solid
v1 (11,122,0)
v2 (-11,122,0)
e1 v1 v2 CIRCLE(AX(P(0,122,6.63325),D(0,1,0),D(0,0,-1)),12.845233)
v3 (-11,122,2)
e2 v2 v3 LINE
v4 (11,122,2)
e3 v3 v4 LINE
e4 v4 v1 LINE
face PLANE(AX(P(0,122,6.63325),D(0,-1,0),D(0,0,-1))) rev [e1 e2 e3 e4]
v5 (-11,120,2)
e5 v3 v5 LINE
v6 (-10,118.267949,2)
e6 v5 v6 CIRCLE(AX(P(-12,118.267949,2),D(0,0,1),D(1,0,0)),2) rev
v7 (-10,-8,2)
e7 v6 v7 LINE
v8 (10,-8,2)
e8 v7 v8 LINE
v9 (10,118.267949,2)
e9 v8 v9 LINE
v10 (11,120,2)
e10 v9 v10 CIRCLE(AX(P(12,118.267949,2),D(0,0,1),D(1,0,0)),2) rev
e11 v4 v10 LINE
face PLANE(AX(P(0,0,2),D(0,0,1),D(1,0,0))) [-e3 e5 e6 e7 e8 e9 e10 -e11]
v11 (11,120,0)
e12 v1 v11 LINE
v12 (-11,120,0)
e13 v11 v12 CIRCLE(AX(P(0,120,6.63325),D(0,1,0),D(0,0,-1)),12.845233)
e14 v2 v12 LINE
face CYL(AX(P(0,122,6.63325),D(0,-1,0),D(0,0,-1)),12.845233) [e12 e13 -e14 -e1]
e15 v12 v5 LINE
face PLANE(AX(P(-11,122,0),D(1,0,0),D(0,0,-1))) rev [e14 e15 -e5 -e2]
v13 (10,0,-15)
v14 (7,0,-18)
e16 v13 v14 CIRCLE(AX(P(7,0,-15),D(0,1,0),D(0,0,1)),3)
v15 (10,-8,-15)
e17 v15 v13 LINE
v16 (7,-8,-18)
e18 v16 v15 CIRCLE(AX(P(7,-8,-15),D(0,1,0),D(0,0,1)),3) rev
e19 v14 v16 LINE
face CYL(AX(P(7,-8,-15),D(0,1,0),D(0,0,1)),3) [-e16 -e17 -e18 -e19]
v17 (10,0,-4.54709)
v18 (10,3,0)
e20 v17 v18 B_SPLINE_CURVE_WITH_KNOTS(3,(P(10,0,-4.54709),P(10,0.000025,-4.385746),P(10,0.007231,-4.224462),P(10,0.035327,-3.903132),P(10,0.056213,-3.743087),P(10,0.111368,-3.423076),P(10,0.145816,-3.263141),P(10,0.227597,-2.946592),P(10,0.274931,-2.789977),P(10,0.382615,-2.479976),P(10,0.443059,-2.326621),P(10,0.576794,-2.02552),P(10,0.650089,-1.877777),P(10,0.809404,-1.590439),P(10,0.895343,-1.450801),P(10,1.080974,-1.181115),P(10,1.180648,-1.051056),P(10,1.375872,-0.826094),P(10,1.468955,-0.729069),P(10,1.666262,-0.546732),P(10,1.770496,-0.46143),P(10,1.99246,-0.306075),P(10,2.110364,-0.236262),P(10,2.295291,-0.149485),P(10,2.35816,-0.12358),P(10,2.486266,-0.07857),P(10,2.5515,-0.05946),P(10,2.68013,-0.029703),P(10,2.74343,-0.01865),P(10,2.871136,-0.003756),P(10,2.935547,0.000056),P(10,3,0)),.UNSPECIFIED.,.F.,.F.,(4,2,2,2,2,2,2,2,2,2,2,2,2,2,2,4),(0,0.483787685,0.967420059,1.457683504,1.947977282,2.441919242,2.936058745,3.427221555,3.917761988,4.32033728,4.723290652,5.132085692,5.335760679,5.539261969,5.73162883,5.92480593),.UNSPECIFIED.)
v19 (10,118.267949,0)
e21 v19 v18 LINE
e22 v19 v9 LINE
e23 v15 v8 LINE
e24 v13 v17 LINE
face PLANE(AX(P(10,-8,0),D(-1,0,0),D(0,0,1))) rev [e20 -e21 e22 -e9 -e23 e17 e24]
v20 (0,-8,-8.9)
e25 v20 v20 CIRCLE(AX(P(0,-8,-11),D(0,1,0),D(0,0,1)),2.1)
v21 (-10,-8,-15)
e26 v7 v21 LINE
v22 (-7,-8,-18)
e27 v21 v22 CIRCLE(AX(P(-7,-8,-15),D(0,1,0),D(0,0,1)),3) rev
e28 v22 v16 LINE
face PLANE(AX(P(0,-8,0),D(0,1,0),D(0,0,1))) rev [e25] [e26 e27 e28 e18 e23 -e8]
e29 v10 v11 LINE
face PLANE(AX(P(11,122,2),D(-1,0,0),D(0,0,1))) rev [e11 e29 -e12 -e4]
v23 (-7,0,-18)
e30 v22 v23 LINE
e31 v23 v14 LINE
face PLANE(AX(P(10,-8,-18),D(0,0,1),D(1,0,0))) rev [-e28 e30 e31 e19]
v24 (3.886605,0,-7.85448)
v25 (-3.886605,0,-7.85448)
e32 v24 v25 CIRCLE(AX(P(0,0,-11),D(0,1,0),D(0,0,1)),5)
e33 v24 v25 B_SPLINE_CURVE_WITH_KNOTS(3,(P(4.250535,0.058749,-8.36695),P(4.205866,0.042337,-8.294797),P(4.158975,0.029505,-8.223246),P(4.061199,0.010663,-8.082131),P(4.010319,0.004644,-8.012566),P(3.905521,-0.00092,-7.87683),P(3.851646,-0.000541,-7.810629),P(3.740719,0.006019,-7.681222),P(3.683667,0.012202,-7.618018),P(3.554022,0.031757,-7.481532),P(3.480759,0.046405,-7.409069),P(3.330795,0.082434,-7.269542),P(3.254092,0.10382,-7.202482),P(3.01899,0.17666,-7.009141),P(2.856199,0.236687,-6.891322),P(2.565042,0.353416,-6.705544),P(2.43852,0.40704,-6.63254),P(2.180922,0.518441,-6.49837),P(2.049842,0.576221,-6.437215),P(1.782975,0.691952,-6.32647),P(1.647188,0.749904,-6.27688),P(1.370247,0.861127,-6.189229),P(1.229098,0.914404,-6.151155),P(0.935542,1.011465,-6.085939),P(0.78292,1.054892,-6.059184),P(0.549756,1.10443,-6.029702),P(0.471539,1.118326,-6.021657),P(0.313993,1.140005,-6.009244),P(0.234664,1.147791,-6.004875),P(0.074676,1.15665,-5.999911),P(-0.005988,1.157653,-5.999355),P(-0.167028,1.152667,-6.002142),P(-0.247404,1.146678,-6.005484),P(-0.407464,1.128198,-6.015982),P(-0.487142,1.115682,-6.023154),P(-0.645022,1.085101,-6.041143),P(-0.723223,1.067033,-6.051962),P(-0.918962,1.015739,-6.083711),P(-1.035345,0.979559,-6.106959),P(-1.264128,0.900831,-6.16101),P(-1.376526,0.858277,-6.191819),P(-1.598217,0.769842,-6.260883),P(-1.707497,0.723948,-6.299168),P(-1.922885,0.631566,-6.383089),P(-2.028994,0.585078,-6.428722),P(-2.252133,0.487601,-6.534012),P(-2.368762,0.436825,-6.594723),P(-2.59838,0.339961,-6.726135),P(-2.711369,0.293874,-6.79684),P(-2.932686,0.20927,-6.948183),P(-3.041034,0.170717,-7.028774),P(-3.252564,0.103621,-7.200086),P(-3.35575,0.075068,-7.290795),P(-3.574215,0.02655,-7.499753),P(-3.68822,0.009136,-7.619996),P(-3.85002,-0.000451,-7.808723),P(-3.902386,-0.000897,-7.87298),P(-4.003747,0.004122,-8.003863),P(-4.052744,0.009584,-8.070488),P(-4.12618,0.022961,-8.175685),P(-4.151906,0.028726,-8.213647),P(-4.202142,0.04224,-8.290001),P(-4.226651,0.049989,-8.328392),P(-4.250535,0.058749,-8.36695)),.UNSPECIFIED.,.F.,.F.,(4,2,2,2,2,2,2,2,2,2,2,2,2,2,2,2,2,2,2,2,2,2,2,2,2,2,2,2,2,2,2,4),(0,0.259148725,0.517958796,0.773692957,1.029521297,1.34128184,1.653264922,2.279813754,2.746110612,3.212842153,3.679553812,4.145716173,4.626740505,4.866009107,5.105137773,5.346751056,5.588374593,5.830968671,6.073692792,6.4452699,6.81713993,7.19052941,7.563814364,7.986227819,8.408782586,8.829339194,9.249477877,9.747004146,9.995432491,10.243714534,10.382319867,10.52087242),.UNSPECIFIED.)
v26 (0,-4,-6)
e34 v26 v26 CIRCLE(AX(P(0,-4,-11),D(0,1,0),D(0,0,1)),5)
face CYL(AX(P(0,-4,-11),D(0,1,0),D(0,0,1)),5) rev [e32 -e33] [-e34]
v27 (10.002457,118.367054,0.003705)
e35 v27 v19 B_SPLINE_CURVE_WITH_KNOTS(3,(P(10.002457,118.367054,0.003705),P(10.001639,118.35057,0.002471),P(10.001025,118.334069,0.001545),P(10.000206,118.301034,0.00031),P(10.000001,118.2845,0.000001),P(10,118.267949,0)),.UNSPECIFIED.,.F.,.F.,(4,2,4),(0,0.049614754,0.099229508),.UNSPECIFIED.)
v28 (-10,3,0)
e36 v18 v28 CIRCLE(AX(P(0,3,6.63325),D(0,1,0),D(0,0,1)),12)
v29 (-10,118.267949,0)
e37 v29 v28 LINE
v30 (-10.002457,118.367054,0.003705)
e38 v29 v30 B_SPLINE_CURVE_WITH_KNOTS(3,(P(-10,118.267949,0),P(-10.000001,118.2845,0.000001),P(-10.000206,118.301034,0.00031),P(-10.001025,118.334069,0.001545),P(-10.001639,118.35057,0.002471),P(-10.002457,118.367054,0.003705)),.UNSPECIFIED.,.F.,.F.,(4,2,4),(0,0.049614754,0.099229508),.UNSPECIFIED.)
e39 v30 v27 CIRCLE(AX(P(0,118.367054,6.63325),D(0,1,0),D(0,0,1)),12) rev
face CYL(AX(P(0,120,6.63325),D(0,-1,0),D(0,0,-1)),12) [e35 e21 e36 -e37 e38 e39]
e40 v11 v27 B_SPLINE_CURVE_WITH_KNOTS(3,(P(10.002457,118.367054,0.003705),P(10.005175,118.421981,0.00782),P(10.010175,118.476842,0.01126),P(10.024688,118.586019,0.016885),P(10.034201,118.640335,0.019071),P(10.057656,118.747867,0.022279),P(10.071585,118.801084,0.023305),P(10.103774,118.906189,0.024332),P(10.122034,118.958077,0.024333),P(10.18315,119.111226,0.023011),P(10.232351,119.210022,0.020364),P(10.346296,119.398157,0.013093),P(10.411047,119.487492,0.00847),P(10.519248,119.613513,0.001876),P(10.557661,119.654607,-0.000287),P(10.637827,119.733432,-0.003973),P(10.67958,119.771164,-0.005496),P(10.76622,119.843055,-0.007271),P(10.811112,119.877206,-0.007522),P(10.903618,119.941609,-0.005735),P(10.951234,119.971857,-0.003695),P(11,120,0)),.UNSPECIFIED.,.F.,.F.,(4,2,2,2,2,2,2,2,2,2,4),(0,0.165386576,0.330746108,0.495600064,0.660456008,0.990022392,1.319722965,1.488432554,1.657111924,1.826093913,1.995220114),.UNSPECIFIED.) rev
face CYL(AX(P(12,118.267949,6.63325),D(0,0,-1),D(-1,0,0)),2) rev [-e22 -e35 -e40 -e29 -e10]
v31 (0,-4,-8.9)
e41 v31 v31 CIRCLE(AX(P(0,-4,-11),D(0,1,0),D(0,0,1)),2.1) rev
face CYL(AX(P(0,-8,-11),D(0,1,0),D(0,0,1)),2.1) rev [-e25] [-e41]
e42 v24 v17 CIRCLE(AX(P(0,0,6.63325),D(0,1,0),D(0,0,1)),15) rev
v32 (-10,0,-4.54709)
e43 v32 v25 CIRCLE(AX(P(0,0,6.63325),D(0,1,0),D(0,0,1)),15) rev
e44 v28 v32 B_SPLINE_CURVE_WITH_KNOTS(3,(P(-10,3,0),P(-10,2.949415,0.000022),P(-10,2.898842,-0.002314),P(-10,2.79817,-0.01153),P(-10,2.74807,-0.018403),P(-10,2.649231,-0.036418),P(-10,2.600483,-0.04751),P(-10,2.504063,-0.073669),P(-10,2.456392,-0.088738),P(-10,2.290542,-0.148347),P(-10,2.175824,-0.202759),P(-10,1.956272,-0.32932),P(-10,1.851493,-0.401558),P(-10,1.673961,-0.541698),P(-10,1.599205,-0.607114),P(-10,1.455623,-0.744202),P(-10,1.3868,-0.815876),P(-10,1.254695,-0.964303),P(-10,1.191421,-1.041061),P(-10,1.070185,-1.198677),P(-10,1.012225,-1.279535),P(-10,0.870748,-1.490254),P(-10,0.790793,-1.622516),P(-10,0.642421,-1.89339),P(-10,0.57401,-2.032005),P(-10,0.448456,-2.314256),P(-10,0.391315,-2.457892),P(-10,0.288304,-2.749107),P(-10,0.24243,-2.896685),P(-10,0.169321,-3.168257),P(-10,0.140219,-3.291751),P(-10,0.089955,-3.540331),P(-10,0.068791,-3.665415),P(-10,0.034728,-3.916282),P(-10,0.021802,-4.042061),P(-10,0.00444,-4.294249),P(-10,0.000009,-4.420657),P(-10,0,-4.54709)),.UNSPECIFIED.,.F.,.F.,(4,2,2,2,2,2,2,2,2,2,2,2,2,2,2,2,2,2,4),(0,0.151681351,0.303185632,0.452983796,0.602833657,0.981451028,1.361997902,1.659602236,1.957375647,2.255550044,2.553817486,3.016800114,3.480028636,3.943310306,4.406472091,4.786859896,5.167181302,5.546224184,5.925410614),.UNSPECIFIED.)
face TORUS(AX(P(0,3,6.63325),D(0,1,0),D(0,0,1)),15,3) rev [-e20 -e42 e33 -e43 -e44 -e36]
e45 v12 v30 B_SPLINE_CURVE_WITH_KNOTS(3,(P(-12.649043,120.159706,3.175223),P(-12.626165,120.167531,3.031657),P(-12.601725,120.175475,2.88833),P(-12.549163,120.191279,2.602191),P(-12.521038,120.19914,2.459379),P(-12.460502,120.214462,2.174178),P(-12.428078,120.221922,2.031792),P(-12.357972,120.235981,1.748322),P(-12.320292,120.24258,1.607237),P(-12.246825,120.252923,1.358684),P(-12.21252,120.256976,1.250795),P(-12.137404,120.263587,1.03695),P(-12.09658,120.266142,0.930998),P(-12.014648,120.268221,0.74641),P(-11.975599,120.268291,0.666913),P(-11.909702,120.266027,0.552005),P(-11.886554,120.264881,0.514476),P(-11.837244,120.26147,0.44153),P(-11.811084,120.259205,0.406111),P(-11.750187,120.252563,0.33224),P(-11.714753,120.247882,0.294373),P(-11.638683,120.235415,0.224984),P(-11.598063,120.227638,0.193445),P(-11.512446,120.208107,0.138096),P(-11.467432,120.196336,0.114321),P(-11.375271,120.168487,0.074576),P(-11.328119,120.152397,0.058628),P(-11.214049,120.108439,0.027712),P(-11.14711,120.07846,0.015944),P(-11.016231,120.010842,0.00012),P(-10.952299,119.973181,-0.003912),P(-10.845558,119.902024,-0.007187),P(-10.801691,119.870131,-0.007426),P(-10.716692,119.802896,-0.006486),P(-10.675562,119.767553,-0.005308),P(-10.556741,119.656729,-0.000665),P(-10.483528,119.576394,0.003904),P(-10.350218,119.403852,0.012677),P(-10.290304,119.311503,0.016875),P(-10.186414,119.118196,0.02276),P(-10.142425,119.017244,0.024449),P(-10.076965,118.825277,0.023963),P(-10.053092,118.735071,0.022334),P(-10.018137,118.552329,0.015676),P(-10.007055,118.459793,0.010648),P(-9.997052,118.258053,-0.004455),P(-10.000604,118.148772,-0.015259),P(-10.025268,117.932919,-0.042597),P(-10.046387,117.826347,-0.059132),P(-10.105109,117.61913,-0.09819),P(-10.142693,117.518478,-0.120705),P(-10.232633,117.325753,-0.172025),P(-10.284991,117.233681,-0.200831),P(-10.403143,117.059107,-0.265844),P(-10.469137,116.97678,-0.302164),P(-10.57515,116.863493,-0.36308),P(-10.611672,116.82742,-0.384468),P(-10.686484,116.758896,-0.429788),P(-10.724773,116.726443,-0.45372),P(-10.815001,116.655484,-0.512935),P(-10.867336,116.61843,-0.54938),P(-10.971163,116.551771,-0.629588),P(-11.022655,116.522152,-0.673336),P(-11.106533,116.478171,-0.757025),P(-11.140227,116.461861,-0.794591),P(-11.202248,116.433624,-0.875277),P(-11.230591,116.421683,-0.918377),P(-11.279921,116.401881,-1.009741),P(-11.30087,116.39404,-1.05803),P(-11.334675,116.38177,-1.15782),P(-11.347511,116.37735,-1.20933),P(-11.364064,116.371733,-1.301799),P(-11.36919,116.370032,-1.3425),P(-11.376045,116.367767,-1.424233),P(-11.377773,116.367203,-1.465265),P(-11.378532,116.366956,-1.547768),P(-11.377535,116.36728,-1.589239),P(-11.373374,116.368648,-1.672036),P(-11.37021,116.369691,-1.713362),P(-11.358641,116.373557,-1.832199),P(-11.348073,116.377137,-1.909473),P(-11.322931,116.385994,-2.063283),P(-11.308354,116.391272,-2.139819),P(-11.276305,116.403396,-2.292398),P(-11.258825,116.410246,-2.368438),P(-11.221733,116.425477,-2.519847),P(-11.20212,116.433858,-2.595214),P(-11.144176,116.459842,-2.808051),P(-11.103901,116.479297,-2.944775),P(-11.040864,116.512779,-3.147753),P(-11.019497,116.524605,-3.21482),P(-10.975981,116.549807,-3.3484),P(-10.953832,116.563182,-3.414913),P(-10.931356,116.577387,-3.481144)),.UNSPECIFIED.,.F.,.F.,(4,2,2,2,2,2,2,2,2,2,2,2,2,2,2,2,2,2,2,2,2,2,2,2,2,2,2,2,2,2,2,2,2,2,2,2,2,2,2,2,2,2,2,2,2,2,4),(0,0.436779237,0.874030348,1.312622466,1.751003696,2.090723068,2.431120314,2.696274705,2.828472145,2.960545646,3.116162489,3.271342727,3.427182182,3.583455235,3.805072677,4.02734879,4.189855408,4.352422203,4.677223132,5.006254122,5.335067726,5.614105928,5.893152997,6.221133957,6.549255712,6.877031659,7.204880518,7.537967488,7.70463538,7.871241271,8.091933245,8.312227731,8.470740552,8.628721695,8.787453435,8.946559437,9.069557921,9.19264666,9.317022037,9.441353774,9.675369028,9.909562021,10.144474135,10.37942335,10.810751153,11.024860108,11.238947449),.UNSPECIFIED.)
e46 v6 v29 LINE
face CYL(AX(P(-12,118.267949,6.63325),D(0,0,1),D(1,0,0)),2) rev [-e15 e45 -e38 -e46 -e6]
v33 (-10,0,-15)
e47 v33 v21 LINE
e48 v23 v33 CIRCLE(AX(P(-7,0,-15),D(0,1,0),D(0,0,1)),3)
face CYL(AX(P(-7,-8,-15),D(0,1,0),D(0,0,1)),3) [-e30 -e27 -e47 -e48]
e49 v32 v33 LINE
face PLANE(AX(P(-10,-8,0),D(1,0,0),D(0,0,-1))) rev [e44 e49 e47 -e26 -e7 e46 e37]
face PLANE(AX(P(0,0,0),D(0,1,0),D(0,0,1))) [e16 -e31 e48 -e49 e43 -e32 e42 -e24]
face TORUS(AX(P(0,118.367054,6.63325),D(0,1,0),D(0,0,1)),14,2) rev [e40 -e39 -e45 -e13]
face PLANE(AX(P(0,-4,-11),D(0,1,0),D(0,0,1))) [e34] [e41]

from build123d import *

# Parameters (mm, degrees)
BOSS_EXTRU_1_DEPTH           = 120
ESQUISSE3_W                  = 20
ESQUISSE3_H                  = 18
BOSS_EXTRU_2_DEPTH           = 8
CONG_1_R                     = 3
CONG_2_R                     = 3
ENL_V_MAT_EXTRU_1_DEPTH      = 122.75385005
ENL_V_MAT_EXTRU_1_DEPTH_BACK = 122.75385005
ESQUISSE4_R                  = 2.1
ENL_V_MAT_EXTRU_2_DEPTH      = 122.75385005
ENL_V_MAT_EXTRU_2_DEPTH_BACK = 4
ESQUISSE5_R                  = 5
ESQUISSE7_W                  = 20
ESQUISSE7_H                  = 128
BOSS_EXTRU_3_DEPTH           = 2
BOSS_EXTRU_4_DEPTH           = 2
CONG_3_R                     = 2


with BuildPart() as part:
    # Esquisse2 → Boss.-Extru.1 (new body)
    with BuildSketch(Plane(origin=(0, 0, 0), x_dir=(1, 0, 0), z_dir=(0, 1, 0))):
        with BuildLine():
            Line((-10, 0), (10, 0))
            ThreePointArc((10, 0), (0, 5.366750419), (-10, 0))
        make_face()
    extrude(amount=BOSS_EXTRU_1_DEPTH)

    # Esquisse3 → Boss.-Extru.2 (add)
    with BuildSketch(Plane.XZ):
        with Locations((0, -9)):
            Rectangle(ESQUISSE3_W, ESQUISSE3_H)
    extrude(amount=BOSS_EXTRU_2_DEPTH)

    # Congé1
    cong_1_edges = [part.edges().sort_by_distance(p)[0] for p in [
        (0, 0, -5.366750419),
    ]]
    fillet(cong_1_edges, radius=CONG_1_R)

    # Congé2
    cong_2_edges = [part.edges().sort_by_distance(p)[0] for p in [
        (10, -4, -18),
        (-10, -4, -18),
    ]]
    fillet(cong_2_edges, radius=CONG_2_R)

    # Esquisse4 → Enlèv. mat.-Extru.1 (cut, two sides: drawn at the far end of the back side and taken through both)
    with BuildSketch(Plane(origin=(0, 0, 0), x_dir=(1, 0, 0), z_dir=(0, 1, 0)).offset(-ENL_V_MAT_EXTRU_1_DEPTH_BACK)):
        with Locations(Location((0, 11, 0), (0, 0, 270))):
            Circle(ESQUISSE4_R)
    extrude(amount=ENL_V_MAT_EXTRU_1_DEPTH + ENL_V_MAT_EXTRU_1_DEPTH_BACK, mode=Mode.SUBTRACT)

    # Esquisse5 → Enlèv. mat.-Extru.2 (cut, two sides: drawn at the far end of the back side and taken through both)
    with BuildSketch(Plane(origin=(0, 0, 0), x_dir=(1, 0, 0), z_dir=(0, 1, 0)).offset(-ENL_V_MAT_EXTRU_2_DEPTH_BACK)):
        with Locations(Location((0, 11, 0), (0, 0, 270))):
            Circle(ESQUISSE5_R)
    extrude(amount=ENL_V_MAT_EXTRU_2_DEPTH + ENL_V_MAT_EXTRU_2_DEPTH_BACK, mode=Mode.SUBTRACT)

    # Esquisse7 → Boss.-Extru.3 (add)
    with BuildSketch(Plane.XY):
        with Locations((0, 56)):
            Rectangle(ESQUISSE7_W, ESQUISSE7_H)
    extrude(amount=BOSS_EXTRU_3_DEPTH)

    # Esquisse8 → Boss.-Extru.4 (add)
    with BuildSketch(Plane(origin=(0, 120, 0), x_dir=(1, 0, 0), z_dir=(0, 1, 0))):
        with BuildLine():
            Line((-11, -2), (11, -2))
            Line((11, -2), (11, 0))
            ThreePointArc((11, 0), (0, 6.211982998), (-11, 0))
            Line((-11, 0), (-11, -2))
        make_face()
    extrude(amount=BOSS_EXTRU_4_DEPTH)

    # Congé3
    # the kernel refuses this fillet: 2 mm, written as the material it adds along each edge
    with BuildSketch(Plane(origin=(-10, 120, -4.330127019), x_dir=(-1, 0, 0), z_dir=(0, 0, 1))) as cong_3_piece_1_section:
        with BuildLine():
            CenterArc((2, 1.732050808), CONG_3_R, 180, 60)
            Line((0, 1.732050808), (-0.04, 1.732050808))
            Line((-0.04, 1.732050808), (-0.04, 0))
            Line((-0.04, 0), (0, -0.04))
            ThreePointArc((0, -0.04), (0.5, -0.04), (0.98, -0.034641016))
            Line((0.98, -0.034641016), (1, 0))
        make_face()
    cong_3_piece_1 = extrude(amount=6.330127019, mode=Mode.PRIVATE)
    cong_3_piece_1 = cong_3_piece_1 & Plane(origin=(0, 119.508015578, 6.633249581), x_dir=(0.8333333333333334, 0, -0.5527707983925666), z_dir=(0, -1, 0)) * Cylinder(12, 20, mode=Mode.PRIVATE)
    add(cong_3_piece_1)
    with BuildSketch(Plane(origin=(0, 120, 6.633249581), x_dir=(0.9700709600485506, 0, -0.24282160626781793), z_dir=(0.24282160626781793, 0, 0.9700709600485506))) as cong_3_piece_2_section:
        with BuildLine():
            CenterArc((14, -1.632945866), CONG_3_R, 125.266736396, 54.733263604)
            Line((12, -1.632945866), (11.96, -1.632945866))
            Line((11.96, -1.632945866), (11.96, 0))
            Line((11.96, 0), (12, 0.04))
            ThreePointArc((12, 0.04), (12.422616289, 0.04), (12.82213723, 0.032658917))
            Line((12.82213723, 0.032658917), (12.845232579, 0))
        make_face()
    cong_3_piece_2 = revolve(axis=Axis((0, 120, 6.633249581), (0, 1, 0)), revolution_arc=151.893732209, mode=Mode.PRIVATE)
    cong_3_piece_2 = split(cong_3_piece_2, bisect_by=Plane(origin=(-10, 119.296936372, -5.570265765), z_dir=(1, 0, 0)), keep=Keep.TOP, mode=Mode.PRIVATE)
    cong_3_piece_2 = split(cong_3_piece_2, bisect_by=Plane(origin=(10, 119.296936372, -5.570265765), z_dir=(-1, 0, 0)), keep=Keep.TOP, mode=Mode.PRIVATE)
    add(cong_3_piece_2)
    with BuildSketch(Plane(origin=(10, 120, -4.330127019), x_dir=(1, 0, 0), z_dir=(0, 0, 1))) as cong_3_piece_3_section:
        with BuildLine():
            CenterArc((2, -1.732050808), CONG_3_R, 120, 60)
            Line((0, -1.732050808), (-0.04, -1.732050808))
            Line((-0.04, -1.732050808), (-0.04, 0))
            Line((-0.04, 0), (0, 0.04))
            ThreePointArc((0, 0.04), (0.5, 0.04), (0.98, 0.034641016))
            Line((0.98, 0.034641016), (1, 0))
        make_face()
    cong_3_piece_3 = extrude(amount=6.330127019, mode=Mode.PRIVATE)
    cong_3_piece_3 = cong_3_piece_3 & Plane(origin=(0, 119.508015797, 6.633249581), x_dir=(0.8333333333333334, 0, -0.5527707983925666), z_dir=(0, -1, 0)) * Cylinder(12, 20, mode=Mode.PRIVATE)
    add(cong_3_piece_3)
    with BuildSketch(Plane(origin=(0, 120, 6.633249581), x_dir=(0.9700709600485506, 0, -0.24282160626781793), z_dir=(0.24282160626781793, 0, 0.9700709600485506))) as cong_3_piece_4a_section:
        with BuildLine():
            CenterArc((14, -1.632945866), CONG_3_R, 125.266736396, 54.733263604)
            Line((12, -1.632945866), (11.96, -1.632945866))
            Line((11.96, -1.632945866), (11.96, 0))
            Line((11.96, 0), (12, 0.04))
            ThreePointArc((12, 0.04), (12.422616289, 0.04), (12.82213723, 0.032658917))
            Line((12.82213723, 0.032658917), (12.845232579, 0))
        make_face()
    cong_3_piece_4a = revolve(axis=Axis((0, 120, 6.633249581), (0, 1, 0)), revolution_arc=151.893732209, mode=Mode.PRIVATE)
    cong_3_piece_4a = split(cong_3_piece_4a, bisect_by=Plane(origin=(-11, 119.572175898, 0.48274505), z_dir=(1, 0, 0)), keep=Keep.TOP, mode=Mode.PRIVATE)
    cong_3_piece_4a = split(cong_3_piece_4a, bisect_by=Plane(origin=(-10, 119.572175898, 0.48274505), z_dir=(-1, 0, 0)), keep=Keep.TOP, mode=Mode.PRIVATE)
    with BuildSketch(Plane(origin=(-10, 120, -4.330127019), x_dir=(-1, 0, 0), z_dir=(0, 0, 1))) as cong_3_piece_4b_section:
        with BuildLine():
            CenterArc((2, 1.732050808), CONG_3_R, 180, 60)
            Line((0, 1.732050808), (-0.04, 1.732050808))
            Line((-0.04, 1.732050808), (-0.04, 0))
            Line((-0.04, 0), (0, -0.04))
            ThreePointArc((0, -0.04), (0.5, -0.04), (0.98, -0.034641016))
            Line((0.98, -0.034641016), (1, 0))
        make_face()
    cong_3_piece_4b = extrude(amount=6.330127019, mode=Mode.PRIVATE)
    cong_3_piece_4b = cong_3_piece_4b & Plane(origin=(0, 119.579872147, 6.633249581), x_dir=(0.8563488385776752, 0, -0.5163977794943224), z_dir=(0, -1, 0)) * Cylinder(12.845232579, 20, mode=Mode.PRIVATE)
    cong_3_piece_4b = cong_3_piece_4b - Plane(origin=(0, 119.579872147, 6.633249581), x_dir=(0.8333333333333334, 0, -0.5527707983925666), z_dir=(0, -1, 0)) * Cylinder(12, 20, mode=Mode.PRIVATE)
    cong_3_piece_4 = cong_3_piece_4a & cong_3_piece_4b
    add(cong_3_piece_4)
    with BuildSketch(Plane(origin=(10, 120, -4.330127019), x_dir=(1, 0, 0), z_dir=(0, 0, 1))) as cong_3_piece_5a_section:
        with BuildLine():
            CenterArc((2, -1.732050808), CONG_3_R, 120, 60)
            Line((0, -1.732050808), (-0.04, -1.732050808))
            Line((-0.04, -1.732050808), (-0.04, 0))
            Line((-0.04, 0), (0, 0.04))
            ThreePointArc((0, 0.04), (0.5, 0.04), (0.98, 0.034641016))
            Line((0.98, 0.034641016), (1, 0))
        make_face()
    cong_3_piece_5a = extrude(amount=6.330127019, mode=Mode.PRIVATE)
    cong_3_piece_5a = cong_3_piece_5a & Plane(origin=(0, 119.57987249, 6.633249581), x_dir=(0.8563488385776752, 0, -0.5163977794943224), z_dir=(0, -1, 0)) * Cylinder(12.845232579, 20, mode=Mode.PRIVATE)
    cong_3_piece_5a = cong_3_piece_5a - Plane(origin=(0, 119.57987249, 6.633249581), x_dir=(0.8333333333333334, 0, -0.5527707983925666), z_dir=(0, -1, 0)) * Cylinder(12, 20, mode=Mode.PRIVATE)
    with BuildSketch(Plane(origin=(0, 120, 6.633249581), x_dir=(0.9700709600485506, 0, -0.24282160626781793), z_dir=(0.24282160626781793, 0, 0.9700709600485506))) as cong_3_piece_5b_section:
        with BuildLine():
            CenterArc((14, -1.632945866), CONG_3_R, 125.266736396, 54.733263604)
            Line((12, -1.632945866), (11.96, -1.632945866))
            Line((11.96, -1.632945866), (11.96, 0))
            Line((11.96, 0), (12, 0.04))
            ThreePointArc((12, 0.04), (12.422616289, 0.04), (12.82213723, 0.032658917))
            Line((12.82213723, 0.032658917), (12.845232579, 0))
        make_face()
    cong_3_piece_5b = revolve(axis=Axis((0, 120, 6.633249581), (0, 1, 0)), revolution_arc=151.893732209, mode=Mode.PRIVATE)
    cong_3_piece_5b = split(cong_3_piece_5b, bisect_by=Plane(origin=(11, 119.572175638, 0.482745123), z_dir=(-1, 0, 0)), keep=Keep.TOP, mode=Mode.PRIVATE)
    cong_3_piece_5b = split(cong_3_piece_5b, bisect_by=Plane(origin=(10, 119.572175638, 0.482745123), z_dir=(1, 0, 0)), keep=Keep.TOP, mode=Mode.PRIVATE)
    cong_3_piece_5 = cong_3_piece_5a & cong_3_piece_5b
    add(cong_3_piece_5)


solid = part.part
